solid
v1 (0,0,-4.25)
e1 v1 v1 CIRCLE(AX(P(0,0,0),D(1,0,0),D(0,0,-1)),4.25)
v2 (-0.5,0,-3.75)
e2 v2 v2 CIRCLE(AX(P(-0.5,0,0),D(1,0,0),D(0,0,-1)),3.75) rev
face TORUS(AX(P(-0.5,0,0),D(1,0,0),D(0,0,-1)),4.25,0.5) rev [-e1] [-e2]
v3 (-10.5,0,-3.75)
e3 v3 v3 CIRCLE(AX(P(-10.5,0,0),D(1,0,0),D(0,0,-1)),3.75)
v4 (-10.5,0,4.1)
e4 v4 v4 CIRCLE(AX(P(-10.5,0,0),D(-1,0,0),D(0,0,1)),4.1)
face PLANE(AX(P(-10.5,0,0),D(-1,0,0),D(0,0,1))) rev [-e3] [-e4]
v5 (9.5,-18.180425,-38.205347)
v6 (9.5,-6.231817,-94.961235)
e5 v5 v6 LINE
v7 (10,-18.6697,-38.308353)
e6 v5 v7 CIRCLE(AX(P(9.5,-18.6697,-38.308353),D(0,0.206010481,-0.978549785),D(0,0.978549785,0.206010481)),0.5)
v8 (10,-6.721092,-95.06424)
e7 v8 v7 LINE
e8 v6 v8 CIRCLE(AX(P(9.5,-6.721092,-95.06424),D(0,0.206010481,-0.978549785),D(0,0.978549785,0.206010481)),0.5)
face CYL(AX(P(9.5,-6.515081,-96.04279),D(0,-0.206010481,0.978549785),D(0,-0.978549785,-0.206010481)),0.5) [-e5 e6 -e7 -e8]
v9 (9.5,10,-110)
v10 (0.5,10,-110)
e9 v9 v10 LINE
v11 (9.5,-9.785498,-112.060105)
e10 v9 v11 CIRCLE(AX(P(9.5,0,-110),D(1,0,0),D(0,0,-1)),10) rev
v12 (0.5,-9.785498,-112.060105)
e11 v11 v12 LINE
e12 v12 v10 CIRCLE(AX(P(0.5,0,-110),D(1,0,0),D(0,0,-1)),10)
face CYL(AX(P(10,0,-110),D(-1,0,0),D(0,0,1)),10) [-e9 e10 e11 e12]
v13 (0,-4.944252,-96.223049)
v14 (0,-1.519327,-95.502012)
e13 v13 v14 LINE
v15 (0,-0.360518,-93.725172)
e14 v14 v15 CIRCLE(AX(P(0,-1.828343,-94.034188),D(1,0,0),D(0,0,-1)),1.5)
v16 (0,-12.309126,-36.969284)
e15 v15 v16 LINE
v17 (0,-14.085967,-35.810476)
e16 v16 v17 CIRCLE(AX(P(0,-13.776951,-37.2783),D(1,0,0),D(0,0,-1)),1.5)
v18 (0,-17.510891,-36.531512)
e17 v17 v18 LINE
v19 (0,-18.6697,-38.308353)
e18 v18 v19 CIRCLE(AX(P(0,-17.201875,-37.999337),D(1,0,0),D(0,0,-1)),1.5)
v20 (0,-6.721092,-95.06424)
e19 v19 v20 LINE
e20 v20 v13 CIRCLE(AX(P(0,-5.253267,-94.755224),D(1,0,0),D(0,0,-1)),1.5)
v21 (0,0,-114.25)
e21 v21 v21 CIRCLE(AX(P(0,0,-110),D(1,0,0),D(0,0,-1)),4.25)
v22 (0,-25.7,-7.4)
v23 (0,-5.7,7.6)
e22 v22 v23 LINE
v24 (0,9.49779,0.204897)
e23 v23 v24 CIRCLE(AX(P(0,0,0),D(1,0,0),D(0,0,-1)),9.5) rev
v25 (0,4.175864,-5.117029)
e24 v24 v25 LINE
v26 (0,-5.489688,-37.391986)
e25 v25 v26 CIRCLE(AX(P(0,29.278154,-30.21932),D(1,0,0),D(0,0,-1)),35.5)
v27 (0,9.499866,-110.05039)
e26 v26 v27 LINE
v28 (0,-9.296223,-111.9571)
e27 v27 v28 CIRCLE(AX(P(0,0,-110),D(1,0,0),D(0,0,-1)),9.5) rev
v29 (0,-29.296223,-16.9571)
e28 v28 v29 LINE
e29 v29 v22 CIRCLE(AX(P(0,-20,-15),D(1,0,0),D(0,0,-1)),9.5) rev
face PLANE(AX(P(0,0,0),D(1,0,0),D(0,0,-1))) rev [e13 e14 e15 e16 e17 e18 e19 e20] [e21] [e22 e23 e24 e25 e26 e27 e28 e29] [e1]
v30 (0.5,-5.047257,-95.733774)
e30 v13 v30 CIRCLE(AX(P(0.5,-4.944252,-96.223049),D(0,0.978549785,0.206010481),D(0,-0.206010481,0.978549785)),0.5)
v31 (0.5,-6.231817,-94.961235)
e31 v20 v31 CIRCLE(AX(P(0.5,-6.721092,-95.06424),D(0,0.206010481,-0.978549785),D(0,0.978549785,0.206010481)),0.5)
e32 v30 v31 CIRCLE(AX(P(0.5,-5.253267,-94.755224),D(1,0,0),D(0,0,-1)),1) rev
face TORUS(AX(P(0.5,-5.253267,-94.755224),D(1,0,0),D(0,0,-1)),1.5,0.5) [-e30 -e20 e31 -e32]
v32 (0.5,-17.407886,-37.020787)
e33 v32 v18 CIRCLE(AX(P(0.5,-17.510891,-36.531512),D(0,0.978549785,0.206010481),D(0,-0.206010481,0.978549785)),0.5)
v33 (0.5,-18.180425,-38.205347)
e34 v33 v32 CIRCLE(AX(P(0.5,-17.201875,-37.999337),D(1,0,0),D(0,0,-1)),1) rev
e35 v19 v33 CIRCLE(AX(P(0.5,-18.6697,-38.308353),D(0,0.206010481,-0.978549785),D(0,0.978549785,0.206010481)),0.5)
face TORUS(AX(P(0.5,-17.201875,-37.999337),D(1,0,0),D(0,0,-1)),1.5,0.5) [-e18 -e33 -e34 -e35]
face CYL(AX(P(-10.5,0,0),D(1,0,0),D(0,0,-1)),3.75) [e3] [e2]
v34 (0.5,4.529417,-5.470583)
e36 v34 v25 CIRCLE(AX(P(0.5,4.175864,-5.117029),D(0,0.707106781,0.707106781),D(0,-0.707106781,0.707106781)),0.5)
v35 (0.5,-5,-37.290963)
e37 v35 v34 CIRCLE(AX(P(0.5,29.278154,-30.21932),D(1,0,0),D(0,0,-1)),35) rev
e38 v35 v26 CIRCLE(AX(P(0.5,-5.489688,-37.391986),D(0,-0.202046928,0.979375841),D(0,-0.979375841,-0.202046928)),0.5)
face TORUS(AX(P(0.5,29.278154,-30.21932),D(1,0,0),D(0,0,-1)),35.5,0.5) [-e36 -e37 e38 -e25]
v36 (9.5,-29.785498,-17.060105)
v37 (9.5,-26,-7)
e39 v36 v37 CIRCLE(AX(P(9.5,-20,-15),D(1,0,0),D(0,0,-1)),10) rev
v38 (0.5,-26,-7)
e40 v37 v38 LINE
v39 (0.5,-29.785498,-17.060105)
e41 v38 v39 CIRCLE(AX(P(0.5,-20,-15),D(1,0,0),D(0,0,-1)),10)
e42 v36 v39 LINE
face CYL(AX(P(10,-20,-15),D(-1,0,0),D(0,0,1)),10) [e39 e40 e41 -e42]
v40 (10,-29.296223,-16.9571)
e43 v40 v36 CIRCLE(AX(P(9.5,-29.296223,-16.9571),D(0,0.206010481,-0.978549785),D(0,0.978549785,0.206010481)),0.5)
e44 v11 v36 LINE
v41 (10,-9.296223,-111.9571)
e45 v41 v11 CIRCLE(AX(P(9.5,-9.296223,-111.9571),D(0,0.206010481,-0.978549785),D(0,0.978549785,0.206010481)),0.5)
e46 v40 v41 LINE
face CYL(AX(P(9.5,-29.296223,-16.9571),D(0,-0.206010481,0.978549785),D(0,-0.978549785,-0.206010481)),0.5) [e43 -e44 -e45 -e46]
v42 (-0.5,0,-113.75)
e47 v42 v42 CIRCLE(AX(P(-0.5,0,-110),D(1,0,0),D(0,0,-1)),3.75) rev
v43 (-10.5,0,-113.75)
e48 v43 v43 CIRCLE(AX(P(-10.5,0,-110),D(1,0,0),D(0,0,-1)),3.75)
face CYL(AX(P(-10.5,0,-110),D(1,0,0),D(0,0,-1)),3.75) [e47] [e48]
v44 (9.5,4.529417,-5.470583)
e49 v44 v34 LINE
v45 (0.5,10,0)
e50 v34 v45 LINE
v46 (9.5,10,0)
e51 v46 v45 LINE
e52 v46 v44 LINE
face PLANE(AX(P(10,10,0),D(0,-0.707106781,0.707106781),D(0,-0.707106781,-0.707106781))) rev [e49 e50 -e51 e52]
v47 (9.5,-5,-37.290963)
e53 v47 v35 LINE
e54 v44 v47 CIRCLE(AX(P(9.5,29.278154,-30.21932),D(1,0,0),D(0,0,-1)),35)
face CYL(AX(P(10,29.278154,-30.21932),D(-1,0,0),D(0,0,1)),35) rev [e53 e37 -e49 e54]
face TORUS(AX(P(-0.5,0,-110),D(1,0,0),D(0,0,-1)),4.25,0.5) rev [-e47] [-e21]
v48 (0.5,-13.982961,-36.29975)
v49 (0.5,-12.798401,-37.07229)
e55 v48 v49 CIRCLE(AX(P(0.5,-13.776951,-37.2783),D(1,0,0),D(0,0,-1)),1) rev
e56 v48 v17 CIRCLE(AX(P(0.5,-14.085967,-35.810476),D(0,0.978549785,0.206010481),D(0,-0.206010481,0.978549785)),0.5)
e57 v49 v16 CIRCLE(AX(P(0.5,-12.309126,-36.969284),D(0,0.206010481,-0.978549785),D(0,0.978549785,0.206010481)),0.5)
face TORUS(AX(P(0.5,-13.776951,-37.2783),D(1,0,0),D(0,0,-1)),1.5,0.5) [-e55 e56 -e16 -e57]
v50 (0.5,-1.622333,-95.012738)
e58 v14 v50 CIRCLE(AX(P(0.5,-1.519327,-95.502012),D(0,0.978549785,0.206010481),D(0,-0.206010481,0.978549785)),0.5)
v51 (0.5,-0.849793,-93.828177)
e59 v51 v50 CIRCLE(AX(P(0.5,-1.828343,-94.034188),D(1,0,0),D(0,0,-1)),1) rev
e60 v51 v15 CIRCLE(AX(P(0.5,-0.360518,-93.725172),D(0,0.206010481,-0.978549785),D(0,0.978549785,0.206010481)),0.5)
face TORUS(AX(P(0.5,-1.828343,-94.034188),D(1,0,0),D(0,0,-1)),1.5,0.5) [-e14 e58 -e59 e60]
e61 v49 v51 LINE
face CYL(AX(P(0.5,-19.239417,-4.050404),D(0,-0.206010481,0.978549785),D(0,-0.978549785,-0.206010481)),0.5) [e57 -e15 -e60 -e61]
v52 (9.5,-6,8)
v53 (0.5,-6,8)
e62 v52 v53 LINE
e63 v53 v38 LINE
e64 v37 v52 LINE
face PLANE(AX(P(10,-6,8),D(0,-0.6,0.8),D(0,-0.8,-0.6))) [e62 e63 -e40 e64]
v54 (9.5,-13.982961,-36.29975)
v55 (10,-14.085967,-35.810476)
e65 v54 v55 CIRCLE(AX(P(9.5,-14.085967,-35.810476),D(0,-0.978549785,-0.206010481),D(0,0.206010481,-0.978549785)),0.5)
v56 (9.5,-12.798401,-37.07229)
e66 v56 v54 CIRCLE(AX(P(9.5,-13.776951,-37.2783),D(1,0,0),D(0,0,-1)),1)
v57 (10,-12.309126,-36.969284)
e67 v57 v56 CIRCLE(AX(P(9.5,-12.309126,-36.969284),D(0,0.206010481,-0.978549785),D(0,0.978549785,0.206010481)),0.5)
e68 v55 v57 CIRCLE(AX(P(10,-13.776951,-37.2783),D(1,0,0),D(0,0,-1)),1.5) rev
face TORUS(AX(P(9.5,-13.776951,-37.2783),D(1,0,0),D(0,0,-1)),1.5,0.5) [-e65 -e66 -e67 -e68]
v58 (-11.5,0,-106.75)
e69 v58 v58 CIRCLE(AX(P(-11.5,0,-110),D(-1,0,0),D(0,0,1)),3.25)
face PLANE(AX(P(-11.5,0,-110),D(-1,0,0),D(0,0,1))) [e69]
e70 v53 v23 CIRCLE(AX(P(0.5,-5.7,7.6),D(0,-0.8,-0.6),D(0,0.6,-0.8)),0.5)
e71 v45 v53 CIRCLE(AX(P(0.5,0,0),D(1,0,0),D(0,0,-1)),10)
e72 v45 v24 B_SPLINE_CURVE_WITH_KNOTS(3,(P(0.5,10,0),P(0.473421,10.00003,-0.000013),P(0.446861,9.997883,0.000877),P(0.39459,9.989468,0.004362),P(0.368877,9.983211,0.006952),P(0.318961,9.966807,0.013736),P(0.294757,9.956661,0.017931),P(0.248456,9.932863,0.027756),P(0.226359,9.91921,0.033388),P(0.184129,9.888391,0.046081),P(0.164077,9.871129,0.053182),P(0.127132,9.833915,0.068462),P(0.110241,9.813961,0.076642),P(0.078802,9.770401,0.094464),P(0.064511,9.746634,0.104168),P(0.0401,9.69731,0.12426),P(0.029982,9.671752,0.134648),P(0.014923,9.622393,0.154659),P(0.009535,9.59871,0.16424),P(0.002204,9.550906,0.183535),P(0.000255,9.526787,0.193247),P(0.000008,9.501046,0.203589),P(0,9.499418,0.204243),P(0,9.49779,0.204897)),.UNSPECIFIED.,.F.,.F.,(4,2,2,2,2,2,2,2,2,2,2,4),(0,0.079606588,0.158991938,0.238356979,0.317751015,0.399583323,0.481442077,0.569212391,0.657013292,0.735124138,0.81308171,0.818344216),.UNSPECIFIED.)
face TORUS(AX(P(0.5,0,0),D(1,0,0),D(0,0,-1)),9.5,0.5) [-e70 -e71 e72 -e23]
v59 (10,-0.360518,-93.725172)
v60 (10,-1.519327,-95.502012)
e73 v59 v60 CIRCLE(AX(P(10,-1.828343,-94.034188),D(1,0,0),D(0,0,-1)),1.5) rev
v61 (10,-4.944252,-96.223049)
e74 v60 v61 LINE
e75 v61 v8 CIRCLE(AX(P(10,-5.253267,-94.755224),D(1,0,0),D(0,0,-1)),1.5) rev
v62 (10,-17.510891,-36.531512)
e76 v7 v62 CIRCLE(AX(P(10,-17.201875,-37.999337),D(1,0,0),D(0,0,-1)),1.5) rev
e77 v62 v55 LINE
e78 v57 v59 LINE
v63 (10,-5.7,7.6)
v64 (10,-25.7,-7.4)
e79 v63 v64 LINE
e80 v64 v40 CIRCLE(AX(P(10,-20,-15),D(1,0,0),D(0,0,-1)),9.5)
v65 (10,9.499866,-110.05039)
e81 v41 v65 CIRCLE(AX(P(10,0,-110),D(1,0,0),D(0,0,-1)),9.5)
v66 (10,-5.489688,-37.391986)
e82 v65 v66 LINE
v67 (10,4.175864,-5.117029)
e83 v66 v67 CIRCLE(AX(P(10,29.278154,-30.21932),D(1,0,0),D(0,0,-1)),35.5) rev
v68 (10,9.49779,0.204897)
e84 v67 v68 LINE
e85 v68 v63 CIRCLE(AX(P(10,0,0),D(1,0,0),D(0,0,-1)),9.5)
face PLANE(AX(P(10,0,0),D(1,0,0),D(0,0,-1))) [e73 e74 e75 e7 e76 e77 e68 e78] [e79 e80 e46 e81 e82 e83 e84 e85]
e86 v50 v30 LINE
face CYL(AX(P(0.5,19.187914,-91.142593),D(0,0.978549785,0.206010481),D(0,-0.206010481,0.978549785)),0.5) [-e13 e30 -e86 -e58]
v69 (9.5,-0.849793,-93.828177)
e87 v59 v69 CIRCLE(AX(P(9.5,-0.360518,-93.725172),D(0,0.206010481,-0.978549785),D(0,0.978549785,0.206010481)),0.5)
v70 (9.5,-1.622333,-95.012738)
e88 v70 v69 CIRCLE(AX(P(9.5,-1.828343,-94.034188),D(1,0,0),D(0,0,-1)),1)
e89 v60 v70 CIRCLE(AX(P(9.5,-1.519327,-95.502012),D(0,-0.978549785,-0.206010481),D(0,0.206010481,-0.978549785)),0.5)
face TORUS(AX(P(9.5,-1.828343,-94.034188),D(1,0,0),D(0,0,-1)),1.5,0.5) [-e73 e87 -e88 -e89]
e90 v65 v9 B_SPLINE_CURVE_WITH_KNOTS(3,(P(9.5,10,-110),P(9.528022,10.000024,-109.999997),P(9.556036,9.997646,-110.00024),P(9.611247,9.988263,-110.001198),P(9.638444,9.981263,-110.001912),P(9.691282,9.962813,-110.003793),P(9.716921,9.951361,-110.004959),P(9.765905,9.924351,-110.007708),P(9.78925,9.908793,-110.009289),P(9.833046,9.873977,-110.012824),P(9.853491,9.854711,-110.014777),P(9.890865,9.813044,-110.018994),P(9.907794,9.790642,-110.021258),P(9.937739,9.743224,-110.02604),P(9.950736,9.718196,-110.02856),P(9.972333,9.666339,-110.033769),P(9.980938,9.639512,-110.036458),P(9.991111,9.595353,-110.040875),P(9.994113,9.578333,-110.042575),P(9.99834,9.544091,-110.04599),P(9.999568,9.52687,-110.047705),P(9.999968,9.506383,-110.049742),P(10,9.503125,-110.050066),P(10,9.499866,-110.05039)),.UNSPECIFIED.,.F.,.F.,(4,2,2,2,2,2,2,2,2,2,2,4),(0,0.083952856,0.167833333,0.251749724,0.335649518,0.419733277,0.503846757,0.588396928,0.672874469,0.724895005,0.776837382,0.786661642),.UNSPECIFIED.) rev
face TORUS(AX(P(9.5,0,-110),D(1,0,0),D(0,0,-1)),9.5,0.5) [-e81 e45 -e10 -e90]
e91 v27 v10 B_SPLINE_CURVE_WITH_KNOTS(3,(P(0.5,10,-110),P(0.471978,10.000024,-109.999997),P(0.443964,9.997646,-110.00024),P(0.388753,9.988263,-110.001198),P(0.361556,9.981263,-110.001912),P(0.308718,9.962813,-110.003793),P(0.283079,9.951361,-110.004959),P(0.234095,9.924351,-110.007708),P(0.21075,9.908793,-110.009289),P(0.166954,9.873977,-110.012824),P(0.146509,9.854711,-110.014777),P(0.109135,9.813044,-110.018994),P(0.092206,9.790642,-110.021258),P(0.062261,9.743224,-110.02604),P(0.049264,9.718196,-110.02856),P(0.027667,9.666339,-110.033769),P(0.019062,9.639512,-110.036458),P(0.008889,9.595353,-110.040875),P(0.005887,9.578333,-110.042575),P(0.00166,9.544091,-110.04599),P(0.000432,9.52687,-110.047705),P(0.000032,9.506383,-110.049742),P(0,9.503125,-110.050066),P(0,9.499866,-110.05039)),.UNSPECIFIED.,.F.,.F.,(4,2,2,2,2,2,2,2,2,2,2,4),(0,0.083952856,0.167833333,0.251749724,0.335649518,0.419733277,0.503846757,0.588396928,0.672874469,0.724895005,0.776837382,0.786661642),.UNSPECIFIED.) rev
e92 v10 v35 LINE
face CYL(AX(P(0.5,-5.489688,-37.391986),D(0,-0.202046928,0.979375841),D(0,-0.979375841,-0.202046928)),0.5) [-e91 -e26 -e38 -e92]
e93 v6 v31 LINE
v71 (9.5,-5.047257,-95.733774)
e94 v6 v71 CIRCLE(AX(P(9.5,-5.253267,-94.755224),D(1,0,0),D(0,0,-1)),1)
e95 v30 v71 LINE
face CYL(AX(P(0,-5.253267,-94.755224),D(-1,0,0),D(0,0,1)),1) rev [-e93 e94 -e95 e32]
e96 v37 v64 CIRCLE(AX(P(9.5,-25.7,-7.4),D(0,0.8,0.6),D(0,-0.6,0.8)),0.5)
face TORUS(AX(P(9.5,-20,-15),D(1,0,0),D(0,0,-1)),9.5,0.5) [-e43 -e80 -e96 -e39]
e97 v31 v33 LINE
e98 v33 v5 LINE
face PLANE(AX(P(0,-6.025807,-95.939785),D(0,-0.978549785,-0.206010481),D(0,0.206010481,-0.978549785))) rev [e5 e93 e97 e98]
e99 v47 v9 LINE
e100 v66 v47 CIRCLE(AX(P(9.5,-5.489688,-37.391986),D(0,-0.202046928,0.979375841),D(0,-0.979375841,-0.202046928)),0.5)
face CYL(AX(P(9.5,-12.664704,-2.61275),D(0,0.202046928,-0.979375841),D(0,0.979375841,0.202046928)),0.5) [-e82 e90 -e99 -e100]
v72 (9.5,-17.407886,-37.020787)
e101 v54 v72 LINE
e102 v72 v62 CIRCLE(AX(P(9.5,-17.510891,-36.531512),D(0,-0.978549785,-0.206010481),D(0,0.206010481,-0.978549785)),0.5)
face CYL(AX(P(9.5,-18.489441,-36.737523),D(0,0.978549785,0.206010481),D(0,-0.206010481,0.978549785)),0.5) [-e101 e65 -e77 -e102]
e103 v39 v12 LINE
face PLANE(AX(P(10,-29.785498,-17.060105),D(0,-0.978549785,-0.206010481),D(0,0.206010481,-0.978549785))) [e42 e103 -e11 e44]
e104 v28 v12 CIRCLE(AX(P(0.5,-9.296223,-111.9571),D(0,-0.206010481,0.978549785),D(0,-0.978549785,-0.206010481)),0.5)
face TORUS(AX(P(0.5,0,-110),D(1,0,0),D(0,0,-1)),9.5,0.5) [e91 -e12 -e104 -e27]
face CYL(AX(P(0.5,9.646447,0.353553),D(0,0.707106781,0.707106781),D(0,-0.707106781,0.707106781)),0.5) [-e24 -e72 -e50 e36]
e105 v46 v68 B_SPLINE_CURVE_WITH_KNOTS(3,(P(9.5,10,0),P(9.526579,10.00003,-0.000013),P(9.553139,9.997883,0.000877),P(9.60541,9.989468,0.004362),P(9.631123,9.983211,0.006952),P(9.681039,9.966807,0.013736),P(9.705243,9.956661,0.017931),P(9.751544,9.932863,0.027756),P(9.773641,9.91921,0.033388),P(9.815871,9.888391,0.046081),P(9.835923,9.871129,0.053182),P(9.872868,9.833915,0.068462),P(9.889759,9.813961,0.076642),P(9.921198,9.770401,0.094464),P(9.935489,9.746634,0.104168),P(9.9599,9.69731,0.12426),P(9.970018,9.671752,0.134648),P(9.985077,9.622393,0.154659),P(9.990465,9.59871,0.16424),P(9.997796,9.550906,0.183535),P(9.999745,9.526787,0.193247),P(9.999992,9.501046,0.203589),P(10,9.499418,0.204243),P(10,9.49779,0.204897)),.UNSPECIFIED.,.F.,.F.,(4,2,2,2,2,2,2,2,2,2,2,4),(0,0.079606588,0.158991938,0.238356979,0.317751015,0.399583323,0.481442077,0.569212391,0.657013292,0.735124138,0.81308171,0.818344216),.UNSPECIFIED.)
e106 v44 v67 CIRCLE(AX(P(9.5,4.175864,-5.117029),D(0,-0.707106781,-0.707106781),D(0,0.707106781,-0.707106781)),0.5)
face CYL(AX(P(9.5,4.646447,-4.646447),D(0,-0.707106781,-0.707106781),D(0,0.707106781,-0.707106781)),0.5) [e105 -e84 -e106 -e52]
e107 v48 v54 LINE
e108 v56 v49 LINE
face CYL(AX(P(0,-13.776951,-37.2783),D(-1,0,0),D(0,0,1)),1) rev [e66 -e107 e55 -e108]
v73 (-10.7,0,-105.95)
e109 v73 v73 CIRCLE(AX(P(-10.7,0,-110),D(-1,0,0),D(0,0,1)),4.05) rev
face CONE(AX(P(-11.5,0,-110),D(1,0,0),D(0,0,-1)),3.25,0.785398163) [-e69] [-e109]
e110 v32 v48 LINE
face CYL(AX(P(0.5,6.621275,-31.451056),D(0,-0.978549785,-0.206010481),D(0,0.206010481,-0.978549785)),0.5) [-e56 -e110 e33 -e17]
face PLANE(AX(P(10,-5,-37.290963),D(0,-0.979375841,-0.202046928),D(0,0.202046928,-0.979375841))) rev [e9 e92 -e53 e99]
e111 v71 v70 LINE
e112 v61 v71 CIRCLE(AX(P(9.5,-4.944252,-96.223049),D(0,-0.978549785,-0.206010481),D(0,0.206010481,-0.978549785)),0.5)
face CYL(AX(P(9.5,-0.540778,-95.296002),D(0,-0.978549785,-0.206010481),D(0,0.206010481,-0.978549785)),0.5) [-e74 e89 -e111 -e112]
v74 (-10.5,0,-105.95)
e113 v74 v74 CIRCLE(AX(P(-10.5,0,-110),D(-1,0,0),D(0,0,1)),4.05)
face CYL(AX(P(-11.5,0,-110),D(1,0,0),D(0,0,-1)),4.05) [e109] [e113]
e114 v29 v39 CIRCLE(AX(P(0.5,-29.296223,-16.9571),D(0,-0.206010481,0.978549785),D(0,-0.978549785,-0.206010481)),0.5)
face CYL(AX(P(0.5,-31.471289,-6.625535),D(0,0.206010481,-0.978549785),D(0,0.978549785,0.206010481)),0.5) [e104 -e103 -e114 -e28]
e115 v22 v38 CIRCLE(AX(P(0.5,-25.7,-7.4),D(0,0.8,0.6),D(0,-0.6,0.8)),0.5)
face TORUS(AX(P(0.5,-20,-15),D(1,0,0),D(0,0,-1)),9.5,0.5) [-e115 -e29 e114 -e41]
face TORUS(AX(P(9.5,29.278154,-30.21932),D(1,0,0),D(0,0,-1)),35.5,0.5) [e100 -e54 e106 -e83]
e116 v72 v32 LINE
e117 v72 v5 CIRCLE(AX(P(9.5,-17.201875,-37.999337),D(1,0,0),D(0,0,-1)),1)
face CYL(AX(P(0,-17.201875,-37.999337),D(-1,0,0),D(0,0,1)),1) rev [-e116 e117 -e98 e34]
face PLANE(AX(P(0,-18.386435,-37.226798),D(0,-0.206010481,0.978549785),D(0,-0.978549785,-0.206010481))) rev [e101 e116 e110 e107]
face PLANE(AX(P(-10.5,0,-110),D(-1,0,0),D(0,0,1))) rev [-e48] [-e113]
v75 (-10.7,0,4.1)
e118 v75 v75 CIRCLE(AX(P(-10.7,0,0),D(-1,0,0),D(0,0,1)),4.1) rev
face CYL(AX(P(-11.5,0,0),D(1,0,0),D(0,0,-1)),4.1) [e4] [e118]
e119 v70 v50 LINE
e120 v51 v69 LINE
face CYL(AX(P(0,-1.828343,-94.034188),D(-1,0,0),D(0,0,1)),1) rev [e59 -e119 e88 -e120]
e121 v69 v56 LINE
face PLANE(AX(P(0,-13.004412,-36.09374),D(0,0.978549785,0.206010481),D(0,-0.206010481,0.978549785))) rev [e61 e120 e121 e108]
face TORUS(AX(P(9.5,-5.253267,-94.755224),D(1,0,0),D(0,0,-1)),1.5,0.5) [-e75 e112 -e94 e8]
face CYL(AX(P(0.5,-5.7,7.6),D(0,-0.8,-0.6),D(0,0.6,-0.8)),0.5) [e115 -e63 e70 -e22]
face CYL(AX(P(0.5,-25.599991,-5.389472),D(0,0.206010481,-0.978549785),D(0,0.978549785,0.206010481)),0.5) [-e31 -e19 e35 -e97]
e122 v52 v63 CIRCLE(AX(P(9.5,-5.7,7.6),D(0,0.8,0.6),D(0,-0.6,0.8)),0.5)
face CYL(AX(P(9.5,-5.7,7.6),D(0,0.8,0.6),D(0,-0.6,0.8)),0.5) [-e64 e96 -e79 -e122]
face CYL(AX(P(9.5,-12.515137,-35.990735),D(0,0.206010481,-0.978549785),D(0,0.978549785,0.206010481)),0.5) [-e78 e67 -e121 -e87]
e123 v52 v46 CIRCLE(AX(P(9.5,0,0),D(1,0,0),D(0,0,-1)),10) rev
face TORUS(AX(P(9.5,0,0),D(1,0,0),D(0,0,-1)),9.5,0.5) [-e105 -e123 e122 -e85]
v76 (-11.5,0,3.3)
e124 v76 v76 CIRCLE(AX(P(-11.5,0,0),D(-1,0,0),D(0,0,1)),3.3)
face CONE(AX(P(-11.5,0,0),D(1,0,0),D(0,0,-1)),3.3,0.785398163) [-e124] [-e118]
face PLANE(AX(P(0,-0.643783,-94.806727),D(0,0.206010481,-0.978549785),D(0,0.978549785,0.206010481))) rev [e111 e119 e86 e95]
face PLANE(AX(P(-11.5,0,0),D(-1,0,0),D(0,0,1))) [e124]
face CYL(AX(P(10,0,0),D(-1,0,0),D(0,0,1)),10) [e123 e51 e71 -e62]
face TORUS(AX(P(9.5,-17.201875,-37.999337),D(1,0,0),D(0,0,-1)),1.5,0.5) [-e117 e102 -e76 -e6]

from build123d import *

# Parameters (mm, degrees)
SKETCH_1_R          = 3.75
EXTRUDE_1_DEPTH     = 10
EXTRUDE_START       = -20.5
SKETCH_2_R          = 3.75
SKETCH_2_R_2        = 3.750000000000006
EXTRUDE_2_DEPTH     = 20.5
EXTRUDE_3_DEPTH     = 10
CUT_EXTRUDE_1_DEPTH = 125.1380280172035
CUT_EXTRUDE_2_DEPTH = 10
FILLET_1_R          = 1
SKETCH_6_R          = 4.1
EXTRUDE_4_DEPTH     = 1
CHAMFER_1_SIZE      = 0.8
SKETCH_7_R          = 4.0500000000000025
EXTRUDE_5_DEPTH     = 1
CHAMFER_2_SIZE      = 0.8
FILLET_2_R          = 0.5


with BuildPart() as part:
    # 草图1 → 凸台-拉伸1 (new body)
    with BuildSketch(Plane(origin=(0, 0, 0), x_dir=(0, 0, -1), z_dir=(1, 0, 0))):
        with BuildLine():
            Line((0, 10), (110, 10))
            ThreePointArc((110, 10), (120, 0), (110, -10))
            Line((110, -10), (0, -10))
            ThreePointArc((0, -10), (-10, 1.22e-15), (0, 10))
        make_face()
        Circle(SKETCH_1_R, mode=Mode.SUBTRACT)
    extrude(amount=EXTRUDE_1_DEPTH)

    # 草图2 → 凸台-拉伸2 (add)
    with BuildSketch(Plane(origin=(10, 0, 0), x_dir=(0, 0, -1), z_dir=(1, 0, 0)).offset(EXTRUDE_START)):
        Circle(SKETCH_2_R)
        with Locations((110, 0)):
            Circle(SKETCH_2_R_2)
    extrude(amount=EXTRUDE_2_DEPTH)

    # 草图3 → 凸台-拉伸3 (add)
    with BuildSketch(Plane.ZY):
        with BuildLine():
            Line((8.000000000000004, -6.000000000000001), (-6.999999999999994, -26.000000000000007))
            ThreePointArc((-6.999999999999994, -26.000000000000007), (-11.478198300811945, -29.35932223996996), (-17.06010481049842, -29.785497849867497))
            Line((-17.06010481049842, -29.785497849867497), (-112.06010481049843, -9.78549784986749))
            ThreePointArc((-112.06010481049843, -9.78549784986749), (-119.94622990129112, 1.0356209493161885), (-110, 10))
            Line((-110, 10), (6.1e-16, 10))
            ThreePointArc((6.1e-16, 10), (8.944271909999161, 4.472135954999581), (8.000000000000004, -6.000000000000001))
        make_face()
    extrude(amount=-EXTRUDE_3_DEPTH)

    # 草图4 → 切除-拉伸1 (cut, through all)
    with BuildSketch(Plane.ZY):
        with BuildLine():
            Line((6.1e-16, 10), (-5.470582889553741, 4.52941711044617))
            ThreePointArc((-5.470582889553741, 4.52941711044617), (-20.178286006408143, -4.250603826537166), (-37.29096271119613, -4.999999999999999))
            Line((-37.29096271119613, -4.999999999999999), (-110, 10))
            Line((-110, 10), (6.1e-16, 10))
        make_face()
    extrude(amount=-CUT_EXTRUDE_1_DEPTH, mode=Mode.SUBTRACT)

    # 草图5 → 切除-拉伸2 (cut)
    with BuildSketch(Plane(origin=(10, 0, 0), x_dir=(0, 0, -1), z_dir=(1, 0, 0))):
        Polygon((37.22679756914188, -18.386435433698708), (36.093739923367764, -13.004411616271586), (94.8067270225727, -0.643782753281124), (95.93978466834682, -6.0258065707081885), align=None)
    extrude(amount=-CUT_EXTRUDE_2_DEPTH, mode=Mode.SUBTRACT)

    # 圆角1
    fillet_1_edges = [part.edges().sort_by_distance(p)[0] for p in [
        (5, -6.0258065707081885, -95.93978466834682),
        (5, -18.386435433698708, -37.22679756914188),
        (5, -13.004411616271586, -36.093739923367764),
        (5, -0.643782753281124, -94.8067270225727),
    ]]
    fillet(fillet_1_edges, radius=FILLET_1_R)

    # 草图6 → 凸台-拉伸4 (add)
    with BuildSketch(Plane.ZY.offset(10.5)):
        Circle(SKETCH_6_R)
    extrude(amount=EXTRUDE_4_DEPTH)

    # 倒角1
    chamfer_1_edges = [part.edges().sort_by_distance(p)[0] for p in [
        (-11.5, 5e-16, -4.1),
    ]]
    chamfer(chamfer_1_edges, length=CHAMFER_1_SIZE)

    # 草图7 → 凸台-拉伸5 (add)
    with BuildSketch(Plane.ZY.offset(10.5)):
        with Locations((-110, 0)):
            Circle(SKETCH_7_R)
    extrude(amount=EXTRUDE_5_DEPTH)

    # 倒角2
    chamfer_2_edges = [part.edges().sort_by_distance(p)[0] for p in [
        (-11.5, 5e-16, -114.05),
    ]]
    chamfer(chamfer_2_edges, length=CHAMFER_2_SIZE)

    # 圆角2
    # the kernel refuses this fillet: 0.5 mm, written as the material it adds along each edge
    with BuildSketch(Plane(origin=(0, 0, 0), x_dir=(0, 0, -1), z_dir=(0, -1, 0))) as fillet_2_piece_1:
        with BuildLine():
            CenterArc((3.75 + FILLET_2_R, -FILLET_2_R), FILLET_2_R, 90, 90)
            Line((3.75, -FILLET_2_R), (3.75, 0))
            Line((3.75, 0), (3.75 + FILLET_2_R, 0))
        make_face()
    revolve(axis=Axis((0, 0, 0), (1, 0, 0)))
    with BuildSketch(Plane(origin=(0, 0, -110), x_dir=(0, 0, -1), z_dir=(0, 1, 0))) as fillet_2_piece_2:
        with BuildLine():
            CenterArc((3.75 + FILLET_2_R, FILLET_2_R), FILLET_2_R, 180, 90)
            Line((3.75 + FILLET_2_R, 0), (3.75, 0))
            Line((3.75, 0), (3.75, FILLET_2_R))
        make_face()
    revolve(axis=Axis((0, 0, -110), (-1, 0, 0)))
    # the kernel refuses this fillet: 0.5 mm, written as the material it takes off along each edge
    with BuildSketch(Plane(origin=(0, -8.9e-16, -110), x_dir=(0, 0.992175793893205, 0.12484868446398849), z_dir=(0, -0.12484868446398849, 0.992175793893205))) as fillet_2_2_piece_1:
        with BuildLine():
            CenterArc((10.000000000000004 - FILLET_2_R, -FILLET_2_R), FILLET_2_R, 1.272e-14, 90)
            Line((10.000000000000004, -FILLET_2_R), (10.000000000000004, 0))
            Line((10.000000000000004, 0), (10.000000000000004 - FILLET_2_R, 0))
        make_face()
    revolve(axis=Axis((0, -8.9e-16, -110), (-1, 0, 0)), revolution_arc=175.28335954758495, mode=Mode.SUBTRACT)
    with BuildSketch(Plane(origin=(10, -8.9e-16, -110), x_dir=(0, 0.992175793893205, 0.12484868446398853), z_dir=(0, -0.12484868446398853, 0.992175793893205))) as fillet_2_2_piece_2:
        with BuildLine():
            CenterArc((9.999999999999998 - FILLET_2_R, FILLET_2_R), FILLET_2_R, 270, 90)
            Line((9.999999999999998 - FILLET_2_R, 0), (9.999999999999998, 0))
            Line((9.999999999999998, 0), (10.000000000000002, FILLET_2_R))
        make_face()
    revolve(axis=Axis((10, -8.9e-16, -110), (-1, 0, 0)), revolution_arc=175.28335954758495, mode=Mode.SUBTRACT)
    with BuildSketch(Plane(origin=(0, -29.785497849867497, -17.06010481049842), x_dir=(0, 0.9785497849867489, 0.20601048104984193), z_dir=(0, 0.20601048104984196, -0.978549784986749))) as fillet_2_2_piece_3:
        with BuildLine():
            CenterArc((FILLET_2_R, FILLET_2_R), FILLET_2_R, 180, 90)
            Line((0, FILLET_2_R), (0, 0))
            Line((0, 0), (FILLET_2_R, 0))
        make_face()
    extrude(amount=97.08243919473801, mode=Mode.SUBTRACT)
    with BuildSketch(Plane(origin=(0, -20.000000000000007, -14.999999999999993), x_dir=(0, -0.6, 0.8), z_dir=(0, 0.8, 0.6))) as fillet_2_2_piece_4:
        with BuildLine():
            CenterArc((10 - FILLET_2_R, FILLET_2_R), FILLET_2_R, 270, 90)
            Line((10, FILLET_2_R), (10, 0))
            Line((10, 0), (10 - FILLET_2_R, 0))
        make_face()
    revolve(axis=Axis((0, -20.000000000000007, -14.999999999999993), (1, 0, 0)), revolution_arc=65.01876039378399, mode=Mode.SUBTRACT)
    with BuildSketch(Plane(origin=(0, -6.000000000000001, 8.000000000000004), x_dir=(0, 0.5999999999999999, -0.8000000000000003), z_dir=(0, -0.8000000000000003, -0.5999999999999999))) as fillet_2_2_piece_5:
        with BuildLine():
            CenterArc((FILLET_2_R, FILLET_2_R), FILLET_2_R, 180, 90)
            Line((1.95e-15, FILLET_2_R), (0, 0))
            Line((0, 0), (FILLET_2_R, 0))
        make_face()
    extrude(amount=25.000000000000007, mode=Mode.SUBTRACT)
    with BuildSketch(Plane(origin=(10, -6.000000000000001, 8.000000000000004), x_dir=(-1, 0, 0), z_dir=(0, -0.8000000000000003, -0.5999999999999999))) as fillet_2_2_piece_6:
        with BuildLine():
            CenterArc((FILLET_2_R, FILLET_2_R), FILLET_2_R, 179.99999999999986, 90.00000000000011)
            Line((0, FILLET_2_R), (0, 0))
            Line((0, 0), (FILLET_2_R, 0))
        make_face()
    extrude(amount=25.000000000000007, mode=Mode.SUBTRACT)
    with BuildSketch(Plane(origin=(10, -20.000000000000007, -14.999999999999993), x_dir=(0, -0.6, 0.8), z_dir=(0, 0.8, 0.6))) as fillet_2_2_piece_7:
        with BuildLine():
            CenterArc((10 - FILLET_2_R, -FILLET_2_R), FILLET_2_R, 0, 89.9999999999998)
            Line((10 - FILLET_2_R, 0), (10, 0))
            Line((10, 0), (10, -FILLET_2_R))
        make_face()
    revolve(axis=Axis((10, -20.000000000000007, -14.999999999999993), (1, 0, 0)), revolution_arc=65.01876039378399, mode=Mode.SUBTRACT)
    with BuildSketch(Plane(origin=(10, -29.785497849867497, -17.06010481049842), x_dir=(-1, 0, 0), z_dir=(0, 0.20601048104984196, -0.978549784986749))) as fillet_2_2_piece_8:
        with BuildLine():
            CenterArc((FILLET_2_R, FILLET_2_R), FILLET_2_R, 180.00000000000009, 89.99999999999989)
            Line((0, FILLET_2_R), (0, 0))
            Line((0, 0), (FILLET_2_R, 0))
        make_face()
    extrude(amount=97.08243919473801, mode=Mode.SUBTRACT)
    with BuildSketch(Plane(origin=(10, 0, 0), x_dir=(0, -0.5999999999999998, 0.8000000000000002), z_dir=(0, -0.8000000000000002, -0.5999999999999998))) as fillet_2_2_piece_9:
        with BuildLine():
            CenterArc((10 - FILLET_2_R, FILLET_2_R), FILLET_2_R, 270, 90)
            Line((10 - FILLET_2_R, 0), (10, 0))
            Line((10, 0), (10, FILLET_2_R))
        make_face()
    revolve(axis=Axis((10, 0, 0), (-1, 0, 0)), revolution_arc=134.0375887678595, mode=Mode.SUBTRACT)
    with BuildSketch(Plane(origin=(10, 10.883883476483195, 0.8838834764831808), x_dir=(-1, -1.22e-15, 1.22e-15), z_dir=(0, -0.7071067811865532, -0.7071067811865419))) as fillet_2_2_piece_10:
        with BuildLine():
            CenterArc((FILLET_2_R, -FILLET_2_R), FILLET_2_R, 90.0000000000001, 89.99999999999964)
            Line((8.6e-16, -FILLET_2_R), (0, 0))
            Line((0, 0), (FILLET_2_R, 0))
        make_face()
    extrude(amount=8.986572516493164, mode=Mode.SUBTRACT)
    with BuildSketch(Plane(origin=(10, 29.278154451975112, -30.219320231083127), x_dir=(0, -0.979375841485003, -0.20204692800322924), z_dir=(0, 0.20204692800322924, -0.979375841485003))) as fillet_2_2_piece_11:
        with BuildLine():
            CenterArc((34.99999999999999 + FILLET_2_R, FILLET_2_R), FILLET_2_R, 180, 90)
            Line((34.99999999999999 + FILLET_2_R, 0), (34.99999999999999, 0))
            Line((34.99999999999999, 0), (34.99999999999999, FILLET_2_R))
        make_face()
    revolve(axis=Axis((10, 29.278154451975112, -30.219320231083127), (-1, 0, 0)), revolution_arc=56.65668339446081, mode=Mode.SUBTRACT)
    with BuildSketch(Plane(origin=(10, -5, -37.29096271119613), x_dir=(-1, 1.7e-15, 3.5e-16), z_dir=(0, 0.20204692800322901, -0.9793758414850032))) as fillet_2_2_piece_12:
        with BuildLine():
            CenterArc((FILLET_2_R, -FILLET_2_R), FILLET_2_R, 89.9999999999999, 90.0000000000001)
            Line((-8.7e-16, -FILLET_2_R), (0, 0))
            Line((0, 0), (FILLET_2_R, 0))
        make_face()
    extrude(amount=75.49017849833521, mode=Mode.SUBTRACT)
    with BuildSketch(Plane(origin=(0, -4.999999999999999, -37.29096271119613), x_dir=(0, -0.9793758414850032, -0.202046928003229), z_dir=(0, 0.202046928003229, -0.9793758414850031))) as fillet_2_2_piece_13:
        with BuildLine():
            CenterArc((FILLET_2_R, -FILLET_2_R), FILLET_2_R, 90, 90)
            Line((0, -FILLET_2_R), (0, 0))
            Line((0, 0), (FILLET_2_R, 0))
        make_face()
    extrude(amount=75.4901784983352, mode=Mode.SUBTRACT)
    with BuildSketch(Plane(origin=(0, 29.278154451975112, -30.219320231083127), x_dir=(0, -0.7071067811865412, 0.7071067811865538), z_dir=(0, 0.7071067811865538, 0.7071067811865412))) as fillet_2_2_piece_14:
        with BuildLine():
            CenterArc((35 + FILLET_2_R, FILLET_2_R), FILLET_2_R, 180, 90)
            Line((35, FILLET_2_R), (35, 0))
            Line((35, 0), (35 + FILLET_2_R, 0))
        make_face()
    revolve(axis=Axis((0, 29.278154451975112, -30.219320231083127), (1, 0, 0)), revolution_arc=56.65668339446079, mode=Mode.SUBTRACT)
    with BuildSketch(Plane(origin=(0, 10.883883476483193, 0.8838834764831773), x_dir=(0, -0.7071067811865419, 0.7071067811865532), z_dir=(0, -0.7071067811865532, -0.7071067811865419))) as fillet_2_2_piece_15:
        with BuildLine():
            CenterArc((FILLET_2_R, -FILLET_2_R), FILLET_2_R, 90, 90)
            Line((7.9e-16, -FILLET_2_R), (0, 0))
            Line((0, 0), (FILLET_2_R, 0))
        make_face()
    extrude(amount=8.986572516493164, mode=Mode.SUBTRACT)
    with BuildSketch(Plane(origin=(0, 0, 0), x_dir=(0, -0.5999999999999998, 0.8000000000000002), z_dir=(0, -0.8000000000000002, -0.5999999999999998))) as fillet_2_2_piece_16:
        with BuildLine():
            CenterArc((10 - FILLET_2_R, -FILLET_2_R), FILLET_2_R, 6.36e-15, 90)
            Line((10, -FILLET_2_R), (10, 0))
            Line((10, 0), (10 - FILLET_2_R, 0))
        make_face()
    revolve(axis=Axis((0, 0, 0), (-1, 0, 0)), revolution_arc=134.0375887678595, mode=Mode.SUBTRACT)
    with BuildSketch(Plane(origin=(10, -6.231817051758028, -94.96123488336008), x_dir=(-1, 0, 0), z_dir=(0, -0.20601048104984204, 0.978549784986749))) as fillet_2_2_piece_17:
        with BuildLine():
            CenterArc((FILLET_2_R, FILLET_2_R), FILLET_2_R, 180, 90)
            Line((0, FILLET_2_R), (0, 0))
            Line((0, 0), (FILLET_2_R, 0))
        make_face()
    extrude(amount=58.00000000000001, mode=Mode.SUBTRACT)
    with BuildSketch(Plane(origin=(0, -6.231817051758028, -94.96123488336008), x_dir=(0, -0.978549784986749, -0.20601048104984207), z_dir=(0, -0.20601048104984204, 0.978549784986749))) as fillet_2_2_piece_18:
        with BuildLine():
            CenterArc((FILLET_2_R, FILLET_2_R), FILLET_2_R, 180, 90)
            Line((0, FILLET_2_R), (0, 0))
            Line((0, 0), (FILLET_2_R, 0))
        make_face()
    extrude(amount=58.00000000000001, mode=Mode.SUBTRACT)
    with BuildSketch(Plane(origin=(10, -17.407885648711957, -37.02078708809204), x_dir=(-1, 0, 0), z_dir=(0, 0.9785497849867496, 0.2060104810498393))) as fillet_2_2_piece_19:
        with BuildLine():
            CenterArc((FILLET_2_R, FILLET_2_R), FILLET_2_R, 180, 90)
            Line((0, FILLET_2_R), (0, 0))
            Line((0, 0), (FILLET_2_R, 0))
        make_face()
    extrude(amount=3.4999999999999982, mode=Mode.SUBTRACT)
    with BuildSketch(Plane(origin=(0, -17.407885648711957, -37.02078708809204), x_dir=(0, -0.2060104810498393, 0.9785497849867497), z_dir=(0, 0.9785497849867496, 0.2060104810498393))) as fillet_2_2_piece_20:
        with BuildLine():
            CenterArc((FILLET_2_R, FILLET_2_R), FILLET_2_R, 180, 90)
            Line((0, FILLET_2_R), (0, 0))
            Line((0, 0), (FILLET_2_R, 0))
        make_face()
    extrude(amount=3.4999999999999982, mode=Mode.SUBTRACT)
    with BuildSketch(Plane(origin=(10, -1.6223325382678755, -95.01273750362255), x_dir=(-1, -4.7e-16, 2.24e-15), z_dir=(0, -0.9785497849867492, -0.20601048104984138))) as fillet_2_2_piece_21:
        with BuildLine():
            CenterArc((FILLET_2_R, FILLET_2_R), FILLET_2_R, 180.00000000000003, 90.00000000000011)
            Line((-1.14e-15, FILLET_2_R), (0, 0))
            Line((0, 0), (FILLET_2_R, 0))
        make_face()
    extrude(amount=3.499999999999946, mode=Mode.SUBTRACT)
    with BuildSketch(Plane(origin=(0, -1.6223325382678755, -95.01273750362255), x_dir=(0, 0.2060104810498414, -0.9785497849867492), z_dir=(0, -0.9785497849867492, -0.20601048104984138))) as fillet_2_2_piece_22:
        with BuildLine():
            CenterArc((FILLET_2_R, FILLET_2_R), FILLET_2_R, 180, 90)
            Line((-1.1e-15, FILLET_2_R), (0, 0))
            Line((0, 0), (FILLET_2_R, 0))
        make_face()
    extrude(amount=3.499999999999946, mode=Mode.SUBTRACT)
    with BuildSketch(Plane(origin=(10, -12.798401135221745, -37.07228970835451), x_dir=(-1, 0, 0), z_dir=(0, 0.2060104810498411, -0.9785497849867493))) as fillet_2_2_piece_23:
        with BuildLine():
            CenterArc((FILLET_2_R, FILLET_2_R), FILLET_2_R, 180, 90)
            Line((0, FILLET_2_R), (0, 0))
            Line((0, 0), (FILLET_2_R, 0))
        make_face()
    extrude(amount=57.999999999999986, mode=Mode.SUBTRACT)
    with BuildSketch(Plane(origin=(0, -12.798401135221745, -37.07228970835451), x_dir=(0, 0.9785497849867493, 0.20601048104984113), z_dir=(0, 0.2060104810498411, -0.9785497849867493))) as fillet_2_2_piece_24:
        with BuildLine():
            CenterArc((FILLET_2_R, FILLET_2_R), FILLET_2_R, 180, 90)
            Line((0, FILLET_2_R), (0, 0))
            Line((0, 0), (FILLET_2_R, 0))
        make_face()
    extrude(amount=57.999999999999986, mode=Mode.SUBTRACT)
    with BuildSketch(Plane(origin=(10, -17.201875167662116, -37.99933687307879), x_dir=(0, -0.20601048104984135, 0.9785497849867492), z_dir=(0, 0.9785497849867492, 0.20601048104984135))) as fillet_2_2_piece_25:
        with BuildLine():
            CenterArc((0.9999999999999977 + FILLET_2_R, -FILLET_2_R), FILLET_2_R, 90.00000000000007, 89.99999999999994)
            Line((0.9999999999999977 + FILLET_2_R, 0), (0.9999999999999977, 0))
            Line((0.9999999999999977, 0), (0.9999999999999984, -FILLET_2_R))
        make_face()
    revolve(axis=Axis((10, -17.201875167662116, -37.99933687307879), (1, 0, 0)), revolution_arc=90.00000000000023, mode=Mode.SUBTRACT)
    with BuildSketch(Plane(origin=(0, -17.201875167662116, -37.99933687307879), x_dir=(0, -0.20601048104984135, 0.9785497849867492), z_dir=(0, 0.9785497849867492, 0.20601048104984135))) as fillet_2_2_piece_26:
        with BuildLine():
            CenterArc((0.9999999999999977 + FILLET_2_R, FILLET_2_R), FILLET_2_R, 180, 90)
            Line((0.9999999999999984, FILLET_2_R), (0.9999999999999977, 0))
            Line((0.9999999999999977, 0), (0.9999999999999977 + FILLET_2_R, 0))
        make_face()
    revolve(axis=Axis((0, -17.201875167662116, -37.99933687307879), (1, 0, 0)), revolution_arc=90.00000000000023, mode=Mode.SUBTRACT)
    with BuildSketch(Plane(origin=(10, -5.253267266771284, -94.75522440231023), x_dir=(0, 0.20601048104984165, -0.9785497849867492), z_dir=(0, 0.9785497849867492, 0.20601048104984165))) as fillet_2_2_piece_27:
        with BuildLine():
            CenterArc((1.000000000000005 + FILLET_2_R, FILLET_2_R), FILLET_2_R, 180, 90)
            Line((1.000000000000005 + FILLET_2_R, 0), (1.000000000000005, 0))
            Line((1.000000000000005, 0), (1.0000000000000047, FILLET_2_R))
        make_face()
    revolve(axis=Axis((10, -5.253267266771284, -94.75522440231023), (-1, 0, 0)), revolution_arc=89.99999999999984, mode=Mode.SUBTRACT)
    with BuildSketch(Plane(origin=(0, -5.253267266771284, -94.75522440231023), x_dir=(0, 0.20601048104984165, -0.9785497849867492), z_dir=(0, 0.9785497849867492, 0.20601048104984165))) as fillet_2_2_piece_28:
        with BuildLine():
            CenterArc((1.000000000000005 + FILLET_2_R, -FILLET_2_R), FILLET_2_R, 90, 90)
            Line((1.0000000000000047, -FILLET_2_R), (1.000000000000005, 0))
            Line((1.000000000000005, 0), (1.000000000000005 + FILLET_2_R, 0))
        make_face()
    revolve(axis=Axis((0, -5.253267266771284, -94.75522440231023), (-1, 0, 0)), revolution_arc=89.99999999999984, mode=Mode.SUBTRACT)
    with BuildSketch(Plane(origin=(10, -1.8283430193177137, -94.0341877186358), x_dir=(0, 0.9785497849867486, 0.20601048104984443), z_dir=(0, -0.20601048104984443, 0.9785497849867486))) as fillet_2_2_piece_29:
        with BuildLine():
            CenterArc((1.0000000000000002 + FILLET_2_R, FILLET_2_R), FILLET_2_R, 180, 89.99999999999994)
            Line((1.0000000000000002 + FILLET_2_R, 0), (1.0000000000000002, 0))
            Line((1.0000000000000002, 0), (1.000000000000001, FILLET_2_R))
        make_face()
    revolve(axis=Axis((10, -1.8283430193177137, -94.0341877186358), (-1, 0, 0)), revolution_arc=90.0000000000003, mode=Mode.SUBTRACT)
    with BuildSketch(Plane(origin=(0, -1.8283430193177137, -94.0341877186358), x_dir=(0, 0.9785497849867486, 0.20601048104984443), z_dir=(0, -0.20601048104984443, 0.9785497849867486))) as fillet_2_2_piece_30:
        with BuildLine():
            CenterArc((1.0000000000000002 + FILLET_2_R, -FILLET_2_R), FILLET_2_R, 90, 90)
            Line((1.0000000000000007, -FILLET_2_R), (1.0000000000000002, 0))
            Line((1.0000000000000002, 0), (1.0000000000000002 + FILLET_2_R, 0))
        make_face()
    revolve(axis=Axis((0, -1.8283430193177137, -94.0341877186358), (-1, 0, 0)), revolution_arc=90.0000000000003, mode=Mode.SUBTRACT)
    with BuildSketch(Plane(origin=(10, -13.776950920208495, -37.278300189404355), x_dir=(0, -0.20601048104984135, 0.9785497849867492), z_dir=(0, -0.9785497849867492, -0.20601048104984135))) as fillet_2_2_piece_31:
        with BuildLine():
            CenterArc((0.9999999999999977 + FILLET_2_R, FILLET_2_R), FILLET_2_R, 180, 90.00000000000006)
            Line((0.9999999999999977 + FILLET_2_R, 0), (0.9999999999999977, 0))
            Line((0.9999999999999977, 0), (0.9999999999999973, FILLET_2_R))
        make_face()
    revolve(axis=Axis((10, -13.776950920208495, -37.278300189404355), (-1, 0, 0)), revolution_arc=90.0000000000002, mode=Mode.SUBTRACT)
    with BuildSketch(Plane(origin=(0, -13.776950920208495, -37.278300189404355), x_dir=(0, -0.20601048104984135, 0.9785497849867492), z_dir=(0, -0.9785497849867492, -0.20601048104984135))) as fillet_2_2_piece_32:
        with BuildLine():
            CenterArc((0.9999999999999977 + FILLET_2_R, -FILLET_2_R), FILLET_2_R, 90, 90)
            Line((0.9999999999999973, -FILLET_2_R), (0.9999999999999977, 0))
            Line((0.9999999999999977, 0), (0.9999999999999977 + FILLET_2_R, 0))
        make_face()
    revolve(axis=Axis((0, -13.776950920208495, -37.278300189404355), (-1, 0, 0)), revolution_arc=90.0000000000002, mode=Mode.SUBTRACT)


solid = part.part
